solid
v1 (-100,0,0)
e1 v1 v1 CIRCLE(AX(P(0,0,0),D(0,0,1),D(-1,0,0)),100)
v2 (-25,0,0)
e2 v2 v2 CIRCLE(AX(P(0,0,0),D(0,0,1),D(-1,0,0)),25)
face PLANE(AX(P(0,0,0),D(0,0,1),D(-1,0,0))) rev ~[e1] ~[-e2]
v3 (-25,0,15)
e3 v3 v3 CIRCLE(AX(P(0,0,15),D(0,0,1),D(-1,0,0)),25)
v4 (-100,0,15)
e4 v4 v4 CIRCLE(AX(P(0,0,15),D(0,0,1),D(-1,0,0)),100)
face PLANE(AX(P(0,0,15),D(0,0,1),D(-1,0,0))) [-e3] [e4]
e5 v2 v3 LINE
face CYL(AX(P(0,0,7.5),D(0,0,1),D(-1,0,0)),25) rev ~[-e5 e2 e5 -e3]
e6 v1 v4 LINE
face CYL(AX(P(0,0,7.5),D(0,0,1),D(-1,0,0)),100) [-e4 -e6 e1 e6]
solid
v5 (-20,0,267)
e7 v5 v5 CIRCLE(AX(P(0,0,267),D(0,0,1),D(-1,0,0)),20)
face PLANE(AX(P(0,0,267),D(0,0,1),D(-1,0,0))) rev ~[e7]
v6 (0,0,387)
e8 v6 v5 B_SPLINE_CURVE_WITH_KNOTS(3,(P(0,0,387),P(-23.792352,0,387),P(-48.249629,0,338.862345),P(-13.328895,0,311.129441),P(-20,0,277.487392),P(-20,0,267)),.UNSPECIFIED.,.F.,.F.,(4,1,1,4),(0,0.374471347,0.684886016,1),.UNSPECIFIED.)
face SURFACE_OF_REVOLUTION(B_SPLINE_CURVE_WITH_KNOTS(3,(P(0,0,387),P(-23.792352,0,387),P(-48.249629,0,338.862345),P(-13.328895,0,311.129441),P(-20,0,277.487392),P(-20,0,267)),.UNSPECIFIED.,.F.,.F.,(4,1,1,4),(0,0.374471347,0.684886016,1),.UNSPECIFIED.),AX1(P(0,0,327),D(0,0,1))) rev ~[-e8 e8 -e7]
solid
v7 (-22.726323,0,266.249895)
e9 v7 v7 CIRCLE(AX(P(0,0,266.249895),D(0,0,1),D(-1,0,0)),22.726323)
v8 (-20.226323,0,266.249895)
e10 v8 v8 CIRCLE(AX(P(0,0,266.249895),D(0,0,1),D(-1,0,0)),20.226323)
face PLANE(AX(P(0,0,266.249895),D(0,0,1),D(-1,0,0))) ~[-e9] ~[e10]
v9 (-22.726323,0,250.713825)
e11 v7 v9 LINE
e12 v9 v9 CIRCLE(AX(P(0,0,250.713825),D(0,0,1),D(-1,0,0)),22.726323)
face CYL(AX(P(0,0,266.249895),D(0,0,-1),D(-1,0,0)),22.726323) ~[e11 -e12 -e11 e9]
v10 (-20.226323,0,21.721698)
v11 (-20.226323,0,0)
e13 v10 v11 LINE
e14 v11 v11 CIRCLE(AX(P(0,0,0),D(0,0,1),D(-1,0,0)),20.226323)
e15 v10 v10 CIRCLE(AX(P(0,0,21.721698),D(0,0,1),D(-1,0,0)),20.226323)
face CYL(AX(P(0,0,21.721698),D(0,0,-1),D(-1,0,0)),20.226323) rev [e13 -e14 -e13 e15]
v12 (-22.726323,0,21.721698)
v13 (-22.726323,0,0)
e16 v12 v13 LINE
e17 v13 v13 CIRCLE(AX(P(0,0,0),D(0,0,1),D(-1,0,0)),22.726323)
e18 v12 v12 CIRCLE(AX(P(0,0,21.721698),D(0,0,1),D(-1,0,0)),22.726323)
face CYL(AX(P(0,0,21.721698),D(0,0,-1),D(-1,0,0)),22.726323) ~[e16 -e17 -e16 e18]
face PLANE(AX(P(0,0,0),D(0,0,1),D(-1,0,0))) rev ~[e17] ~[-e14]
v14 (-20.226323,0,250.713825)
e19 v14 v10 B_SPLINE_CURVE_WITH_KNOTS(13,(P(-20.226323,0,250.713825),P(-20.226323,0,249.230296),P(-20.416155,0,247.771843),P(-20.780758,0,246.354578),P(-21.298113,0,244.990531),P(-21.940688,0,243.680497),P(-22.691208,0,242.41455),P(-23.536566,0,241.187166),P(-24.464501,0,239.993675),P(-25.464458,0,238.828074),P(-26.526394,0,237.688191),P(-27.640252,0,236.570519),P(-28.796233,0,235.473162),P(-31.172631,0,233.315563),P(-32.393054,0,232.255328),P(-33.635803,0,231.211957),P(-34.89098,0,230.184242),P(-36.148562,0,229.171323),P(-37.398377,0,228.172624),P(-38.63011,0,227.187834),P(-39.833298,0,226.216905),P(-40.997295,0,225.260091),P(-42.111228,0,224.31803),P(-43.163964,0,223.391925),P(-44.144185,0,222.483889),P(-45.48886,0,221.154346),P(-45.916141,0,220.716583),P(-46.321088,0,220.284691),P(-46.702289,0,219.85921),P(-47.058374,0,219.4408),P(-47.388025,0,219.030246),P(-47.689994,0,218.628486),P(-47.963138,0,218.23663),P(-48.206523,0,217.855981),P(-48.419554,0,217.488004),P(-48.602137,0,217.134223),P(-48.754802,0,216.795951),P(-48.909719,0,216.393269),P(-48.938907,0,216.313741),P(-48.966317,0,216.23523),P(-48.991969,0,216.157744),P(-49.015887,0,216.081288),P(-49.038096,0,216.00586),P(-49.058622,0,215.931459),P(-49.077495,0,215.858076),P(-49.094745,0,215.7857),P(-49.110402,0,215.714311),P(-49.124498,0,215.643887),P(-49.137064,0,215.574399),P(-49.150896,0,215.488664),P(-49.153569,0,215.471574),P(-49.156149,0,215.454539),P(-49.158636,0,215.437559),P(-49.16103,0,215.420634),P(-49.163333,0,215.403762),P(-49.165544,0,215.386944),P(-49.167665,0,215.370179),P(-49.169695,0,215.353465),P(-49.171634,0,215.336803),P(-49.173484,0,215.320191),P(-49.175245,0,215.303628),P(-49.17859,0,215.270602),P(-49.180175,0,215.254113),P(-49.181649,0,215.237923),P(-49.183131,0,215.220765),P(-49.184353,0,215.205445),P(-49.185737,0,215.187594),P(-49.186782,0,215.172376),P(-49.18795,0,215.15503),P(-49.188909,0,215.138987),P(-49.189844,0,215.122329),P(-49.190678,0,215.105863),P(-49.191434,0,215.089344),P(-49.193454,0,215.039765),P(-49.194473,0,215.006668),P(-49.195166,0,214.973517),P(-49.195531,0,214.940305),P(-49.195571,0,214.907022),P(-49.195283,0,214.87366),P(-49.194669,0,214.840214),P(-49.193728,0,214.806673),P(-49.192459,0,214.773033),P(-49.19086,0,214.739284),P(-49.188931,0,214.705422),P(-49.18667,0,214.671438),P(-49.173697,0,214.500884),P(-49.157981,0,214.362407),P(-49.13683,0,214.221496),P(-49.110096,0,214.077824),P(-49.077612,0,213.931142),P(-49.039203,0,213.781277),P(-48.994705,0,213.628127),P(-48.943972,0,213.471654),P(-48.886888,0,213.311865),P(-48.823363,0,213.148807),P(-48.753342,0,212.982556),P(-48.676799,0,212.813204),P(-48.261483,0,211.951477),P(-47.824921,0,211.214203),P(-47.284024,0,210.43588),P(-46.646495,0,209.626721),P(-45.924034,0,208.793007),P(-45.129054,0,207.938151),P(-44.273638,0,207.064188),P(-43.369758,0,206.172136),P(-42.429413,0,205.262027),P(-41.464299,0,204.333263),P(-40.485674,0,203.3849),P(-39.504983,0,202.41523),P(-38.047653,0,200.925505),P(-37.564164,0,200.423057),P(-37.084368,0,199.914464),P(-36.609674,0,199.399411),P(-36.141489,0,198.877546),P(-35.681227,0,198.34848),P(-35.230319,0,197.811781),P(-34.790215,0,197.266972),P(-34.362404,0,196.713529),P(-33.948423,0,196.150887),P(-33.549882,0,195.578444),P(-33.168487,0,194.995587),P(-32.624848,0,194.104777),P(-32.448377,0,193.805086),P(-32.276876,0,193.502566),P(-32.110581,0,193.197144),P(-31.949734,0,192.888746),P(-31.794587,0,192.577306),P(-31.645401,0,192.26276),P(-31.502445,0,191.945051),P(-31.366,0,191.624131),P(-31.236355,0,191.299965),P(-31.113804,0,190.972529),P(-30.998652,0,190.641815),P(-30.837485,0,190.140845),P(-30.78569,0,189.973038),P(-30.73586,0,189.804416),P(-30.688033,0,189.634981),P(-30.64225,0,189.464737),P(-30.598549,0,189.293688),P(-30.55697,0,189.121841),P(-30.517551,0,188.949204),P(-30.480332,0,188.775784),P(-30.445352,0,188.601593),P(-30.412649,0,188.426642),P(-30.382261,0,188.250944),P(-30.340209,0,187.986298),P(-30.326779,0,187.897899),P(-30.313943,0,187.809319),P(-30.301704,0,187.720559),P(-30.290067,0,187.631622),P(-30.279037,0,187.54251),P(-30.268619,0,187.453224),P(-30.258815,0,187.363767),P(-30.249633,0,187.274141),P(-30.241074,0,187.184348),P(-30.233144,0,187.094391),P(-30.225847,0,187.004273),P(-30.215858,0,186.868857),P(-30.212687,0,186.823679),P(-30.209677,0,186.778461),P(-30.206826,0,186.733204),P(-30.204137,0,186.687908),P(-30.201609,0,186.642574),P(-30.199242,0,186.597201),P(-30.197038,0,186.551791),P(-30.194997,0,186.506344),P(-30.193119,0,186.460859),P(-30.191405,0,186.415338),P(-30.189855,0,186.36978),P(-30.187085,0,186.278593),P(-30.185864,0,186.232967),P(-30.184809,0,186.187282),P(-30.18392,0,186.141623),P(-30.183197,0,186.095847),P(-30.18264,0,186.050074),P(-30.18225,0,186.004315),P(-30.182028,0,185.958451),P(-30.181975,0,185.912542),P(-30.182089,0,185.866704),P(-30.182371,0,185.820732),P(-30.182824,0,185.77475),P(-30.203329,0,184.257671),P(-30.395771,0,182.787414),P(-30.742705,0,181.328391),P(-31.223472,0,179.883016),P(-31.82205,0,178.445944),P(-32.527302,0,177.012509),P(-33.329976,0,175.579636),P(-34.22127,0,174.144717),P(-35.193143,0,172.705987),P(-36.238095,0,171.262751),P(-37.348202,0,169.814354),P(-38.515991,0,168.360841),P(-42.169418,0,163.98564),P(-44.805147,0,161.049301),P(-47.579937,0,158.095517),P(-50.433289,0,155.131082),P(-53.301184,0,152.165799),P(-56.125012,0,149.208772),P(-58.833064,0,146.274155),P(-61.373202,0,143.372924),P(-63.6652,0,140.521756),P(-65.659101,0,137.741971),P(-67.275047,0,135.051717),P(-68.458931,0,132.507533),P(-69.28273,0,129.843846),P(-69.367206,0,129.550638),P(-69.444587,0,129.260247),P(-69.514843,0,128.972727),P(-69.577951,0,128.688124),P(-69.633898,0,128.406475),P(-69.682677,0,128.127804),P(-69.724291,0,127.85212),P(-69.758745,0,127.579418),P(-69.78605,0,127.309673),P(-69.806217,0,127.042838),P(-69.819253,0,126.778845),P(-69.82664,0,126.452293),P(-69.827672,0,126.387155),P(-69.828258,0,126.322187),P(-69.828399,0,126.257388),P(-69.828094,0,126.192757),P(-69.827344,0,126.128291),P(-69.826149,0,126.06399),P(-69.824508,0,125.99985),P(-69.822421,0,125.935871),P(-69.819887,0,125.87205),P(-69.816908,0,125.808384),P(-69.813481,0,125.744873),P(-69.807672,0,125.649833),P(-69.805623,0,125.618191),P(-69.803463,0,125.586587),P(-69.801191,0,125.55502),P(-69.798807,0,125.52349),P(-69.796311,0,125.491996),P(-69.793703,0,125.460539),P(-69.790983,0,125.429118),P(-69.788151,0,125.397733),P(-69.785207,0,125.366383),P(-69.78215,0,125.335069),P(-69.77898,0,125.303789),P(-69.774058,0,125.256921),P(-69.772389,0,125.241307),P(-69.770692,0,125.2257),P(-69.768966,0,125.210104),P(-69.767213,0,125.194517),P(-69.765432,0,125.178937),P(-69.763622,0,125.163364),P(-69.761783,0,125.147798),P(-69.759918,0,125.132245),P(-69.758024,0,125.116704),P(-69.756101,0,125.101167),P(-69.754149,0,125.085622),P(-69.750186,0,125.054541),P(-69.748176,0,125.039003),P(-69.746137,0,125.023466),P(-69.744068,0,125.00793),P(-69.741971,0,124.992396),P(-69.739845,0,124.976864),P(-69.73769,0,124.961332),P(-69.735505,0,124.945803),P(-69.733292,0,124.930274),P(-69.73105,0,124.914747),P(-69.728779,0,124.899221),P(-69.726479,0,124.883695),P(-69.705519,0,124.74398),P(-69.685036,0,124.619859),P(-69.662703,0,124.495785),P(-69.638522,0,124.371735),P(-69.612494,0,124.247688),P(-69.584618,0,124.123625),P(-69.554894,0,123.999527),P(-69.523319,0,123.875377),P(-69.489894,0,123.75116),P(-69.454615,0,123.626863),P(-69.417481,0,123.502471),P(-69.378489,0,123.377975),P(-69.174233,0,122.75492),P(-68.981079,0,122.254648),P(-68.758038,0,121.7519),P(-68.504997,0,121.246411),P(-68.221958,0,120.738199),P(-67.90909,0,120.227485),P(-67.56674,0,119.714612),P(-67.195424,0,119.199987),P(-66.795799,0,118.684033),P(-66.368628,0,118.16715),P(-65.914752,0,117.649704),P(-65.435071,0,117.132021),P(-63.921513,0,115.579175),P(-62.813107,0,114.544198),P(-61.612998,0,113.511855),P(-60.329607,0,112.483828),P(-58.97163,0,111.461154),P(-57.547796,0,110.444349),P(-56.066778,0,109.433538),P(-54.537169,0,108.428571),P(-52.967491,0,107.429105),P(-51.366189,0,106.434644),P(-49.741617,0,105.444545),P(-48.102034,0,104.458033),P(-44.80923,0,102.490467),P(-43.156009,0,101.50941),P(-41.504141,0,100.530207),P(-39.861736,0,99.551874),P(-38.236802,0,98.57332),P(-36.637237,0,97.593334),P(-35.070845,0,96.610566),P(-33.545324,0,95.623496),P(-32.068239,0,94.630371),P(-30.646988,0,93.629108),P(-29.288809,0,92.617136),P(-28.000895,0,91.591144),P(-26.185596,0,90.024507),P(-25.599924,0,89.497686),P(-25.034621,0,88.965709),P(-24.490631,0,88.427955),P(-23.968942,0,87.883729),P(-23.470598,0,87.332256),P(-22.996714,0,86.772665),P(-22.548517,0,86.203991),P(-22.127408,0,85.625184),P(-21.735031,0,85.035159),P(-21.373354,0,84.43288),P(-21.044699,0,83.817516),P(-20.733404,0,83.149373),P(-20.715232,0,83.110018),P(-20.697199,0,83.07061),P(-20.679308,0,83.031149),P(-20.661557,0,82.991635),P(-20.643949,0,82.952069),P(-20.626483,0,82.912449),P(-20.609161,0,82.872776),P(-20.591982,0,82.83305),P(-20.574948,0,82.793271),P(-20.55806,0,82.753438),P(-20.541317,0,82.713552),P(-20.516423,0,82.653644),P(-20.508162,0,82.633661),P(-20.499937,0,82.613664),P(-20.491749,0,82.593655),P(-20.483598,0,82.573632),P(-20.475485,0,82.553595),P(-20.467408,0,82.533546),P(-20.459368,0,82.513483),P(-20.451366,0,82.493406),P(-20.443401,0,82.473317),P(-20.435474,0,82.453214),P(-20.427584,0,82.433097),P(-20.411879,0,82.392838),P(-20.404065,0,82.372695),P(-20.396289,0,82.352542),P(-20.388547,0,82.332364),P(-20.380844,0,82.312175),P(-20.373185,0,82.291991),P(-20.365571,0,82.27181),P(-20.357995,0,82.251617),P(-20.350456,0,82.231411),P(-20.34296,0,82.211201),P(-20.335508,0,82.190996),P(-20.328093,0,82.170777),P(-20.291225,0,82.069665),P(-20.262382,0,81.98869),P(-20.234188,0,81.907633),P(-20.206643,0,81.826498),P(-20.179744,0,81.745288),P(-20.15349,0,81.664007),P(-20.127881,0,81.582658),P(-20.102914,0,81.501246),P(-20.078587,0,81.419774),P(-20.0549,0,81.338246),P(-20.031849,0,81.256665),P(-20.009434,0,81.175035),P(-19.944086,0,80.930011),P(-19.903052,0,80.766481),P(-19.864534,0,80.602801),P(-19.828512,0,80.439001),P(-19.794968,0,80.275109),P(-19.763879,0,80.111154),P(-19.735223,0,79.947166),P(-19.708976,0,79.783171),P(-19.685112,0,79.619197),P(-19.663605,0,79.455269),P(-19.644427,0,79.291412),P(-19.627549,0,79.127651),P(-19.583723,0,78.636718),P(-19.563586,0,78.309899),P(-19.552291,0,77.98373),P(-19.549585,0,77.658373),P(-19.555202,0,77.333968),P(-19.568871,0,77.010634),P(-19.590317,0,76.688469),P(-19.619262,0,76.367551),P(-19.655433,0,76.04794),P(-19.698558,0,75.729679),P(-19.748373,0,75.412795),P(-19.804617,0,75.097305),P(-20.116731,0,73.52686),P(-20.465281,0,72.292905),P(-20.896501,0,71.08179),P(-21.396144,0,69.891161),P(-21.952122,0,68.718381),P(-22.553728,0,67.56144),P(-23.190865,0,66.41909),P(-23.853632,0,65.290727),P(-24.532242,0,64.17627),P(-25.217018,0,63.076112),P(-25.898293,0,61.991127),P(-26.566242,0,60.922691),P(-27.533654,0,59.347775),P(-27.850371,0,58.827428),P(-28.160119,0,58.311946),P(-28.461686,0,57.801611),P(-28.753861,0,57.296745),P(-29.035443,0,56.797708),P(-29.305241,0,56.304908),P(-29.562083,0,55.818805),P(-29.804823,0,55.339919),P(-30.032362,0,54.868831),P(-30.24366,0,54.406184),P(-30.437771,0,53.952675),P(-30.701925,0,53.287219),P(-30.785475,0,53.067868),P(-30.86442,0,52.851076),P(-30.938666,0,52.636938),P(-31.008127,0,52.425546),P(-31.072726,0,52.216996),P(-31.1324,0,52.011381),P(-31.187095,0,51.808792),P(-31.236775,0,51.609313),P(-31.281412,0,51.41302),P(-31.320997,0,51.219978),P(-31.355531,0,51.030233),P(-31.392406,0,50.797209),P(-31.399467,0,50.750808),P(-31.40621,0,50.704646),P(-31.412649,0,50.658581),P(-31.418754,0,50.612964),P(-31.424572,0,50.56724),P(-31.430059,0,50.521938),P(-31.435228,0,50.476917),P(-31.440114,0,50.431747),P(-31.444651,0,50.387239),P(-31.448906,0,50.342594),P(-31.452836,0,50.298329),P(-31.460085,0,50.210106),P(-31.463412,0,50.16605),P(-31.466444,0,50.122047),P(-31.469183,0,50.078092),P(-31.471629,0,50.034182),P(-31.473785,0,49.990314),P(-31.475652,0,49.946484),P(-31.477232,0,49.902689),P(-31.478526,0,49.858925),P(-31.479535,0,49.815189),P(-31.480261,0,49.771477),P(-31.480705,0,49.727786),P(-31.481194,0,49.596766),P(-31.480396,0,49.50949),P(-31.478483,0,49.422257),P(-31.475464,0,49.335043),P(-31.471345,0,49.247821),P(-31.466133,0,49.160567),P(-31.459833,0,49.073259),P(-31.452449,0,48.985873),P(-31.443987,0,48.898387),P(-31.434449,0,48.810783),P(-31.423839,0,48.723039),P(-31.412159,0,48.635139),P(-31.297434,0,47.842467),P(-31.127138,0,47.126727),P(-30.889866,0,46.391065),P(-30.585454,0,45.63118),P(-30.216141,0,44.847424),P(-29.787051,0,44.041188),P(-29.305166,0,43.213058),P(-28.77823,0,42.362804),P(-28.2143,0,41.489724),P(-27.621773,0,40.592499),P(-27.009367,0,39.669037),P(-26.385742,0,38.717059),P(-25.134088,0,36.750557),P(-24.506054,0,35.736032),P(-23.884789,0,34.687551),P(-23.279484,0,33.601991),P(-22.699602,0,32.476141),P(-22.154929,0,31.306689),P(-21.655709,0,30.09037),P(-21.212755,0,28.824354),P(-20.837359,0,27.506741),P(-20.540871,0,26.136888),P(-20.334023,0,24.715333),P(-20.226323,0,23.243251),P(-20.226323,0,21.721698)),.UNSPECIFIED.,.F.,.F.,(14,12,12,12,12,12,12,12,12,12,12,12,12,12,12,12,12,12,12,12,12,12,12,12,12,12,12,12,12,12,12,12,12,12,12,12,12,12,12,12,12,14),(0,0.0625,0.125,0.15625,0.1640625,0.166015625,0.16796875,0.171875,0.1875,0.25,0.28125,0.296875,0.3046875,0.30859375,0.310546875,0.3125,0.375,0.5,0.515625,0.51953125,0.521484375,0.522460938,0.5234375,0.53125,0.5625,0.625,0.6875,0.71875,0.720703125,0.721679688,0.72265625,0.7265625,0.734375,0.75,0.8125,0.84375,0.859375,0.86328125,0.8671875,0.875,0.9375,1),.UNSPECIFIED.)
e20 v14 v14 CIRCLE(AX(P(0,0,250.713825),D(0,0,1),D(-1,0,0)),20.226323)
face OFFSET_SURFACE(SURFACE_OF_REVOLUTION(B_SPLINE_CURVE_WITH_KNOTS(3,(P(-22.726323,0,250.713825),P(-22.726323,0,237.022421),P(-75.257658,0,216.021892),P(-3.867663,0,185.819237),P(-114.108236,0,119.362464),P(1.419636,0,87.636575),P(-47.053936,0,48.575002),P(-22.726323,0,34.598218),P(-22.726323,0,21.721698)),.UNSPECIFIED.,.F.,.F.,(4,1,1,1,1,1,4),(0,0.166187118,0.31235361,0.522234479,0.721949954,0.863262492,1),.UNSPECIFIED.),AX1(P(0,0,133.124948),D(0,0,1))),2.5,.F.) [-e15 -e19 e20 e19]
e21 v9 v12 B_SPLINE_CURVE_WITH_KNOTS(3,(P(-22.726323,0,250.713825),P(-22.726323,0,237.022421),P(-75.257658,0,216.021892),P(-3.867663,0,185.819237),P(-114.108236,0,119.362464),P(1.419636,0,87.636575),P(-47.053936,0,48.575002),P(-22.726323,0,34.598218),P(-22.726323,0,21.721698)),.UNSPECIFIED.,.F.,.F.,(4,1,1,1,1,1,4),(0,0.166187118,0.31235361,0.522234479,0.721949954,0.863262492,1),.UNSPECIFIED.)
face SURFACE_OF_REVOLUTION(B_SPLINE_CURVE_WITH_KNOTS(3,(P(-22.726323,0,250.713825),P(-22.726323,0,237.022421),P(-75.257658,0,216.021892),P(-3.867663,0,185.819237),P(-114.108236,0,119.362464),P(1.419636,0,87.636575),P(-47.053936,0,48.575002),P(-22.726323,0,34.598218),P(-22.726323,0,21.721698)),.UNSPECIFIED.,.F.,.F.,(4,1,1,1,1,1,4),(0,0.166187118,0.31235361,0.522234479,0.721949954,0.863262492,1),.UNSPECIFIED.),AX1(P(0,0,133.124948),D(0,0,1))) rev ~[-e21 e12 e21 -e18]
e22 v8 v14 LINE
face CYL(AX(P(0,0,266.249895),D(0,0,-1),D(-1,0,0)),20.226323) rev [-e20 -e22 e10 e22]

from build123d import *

# Parameters (mm, degrees)
F0_W = 75
F0_H = 15
F4_T = -2.5


# Not quite as in the source:
# - a feature of the source that left no trace in its solid (it failed there, or was rolled back) is left out


with BuildPart() as f1:
    # F0 (on Front) → F1 (revolve)
    with BuildSketch(Plane.XZ):
        with Locations((-62.5, 7.5)):
            Rectangle(F0_W, F0_H)
    revolve(axis=Axis((0, 0, 28.5546835512), (0, 0, 1)))


with BuildPart() as f3:
    # F2 (on Front) → F3 (revolve)
    with BuildSketch(Plane.XZ):
        with BuildLine():
            Line((-22.7263234556, 21.7216983438), (-22.7263234556, 0))
            Line((-22.7263234556, 0), (0, 0))
            Line((0, 0), (0, 266.2498950958))
            Line((0, 266.2498950958), (-22.7263234556, 266.2498950958))
            Line((-22.7263234556, 266.2498950958), (-22.7263234556, 250.7138252258))
            add(Edge.make_bspline(
                [(-22.7263234556, 250.7138252258), (-22.7263234556, 237.0224211611), (-75.2576582833, 216.0218915756), (-3.8676634027, 185.8192369168), (-114.1082361223, 119.3624638974), (1.4196364649, 87.636575241), (-47.0539357888, 48.5750019051), (-22.7263234556, 34.5982177026), (-22.7263234556, 21.7216983438)],
                knots=[0, 0, 0, 0, 0.166187118, 0.31235361, 0.5222344792, 0.7219499539, 0.8632624919, 1, 1, 1, 1], degree=3))
        make_face()
    revolve(axis=Axis((0, 0, 133.1249475479), (0, 0, 1)))

    # F4
    f4_openings = [f3.faces().sort_by_distance(p)[0] for p in [
        (0, 0, 266.249895),
        (0, 0, 0),
    ]]
    offset(amount=F4_T, openings=f4_openings)


with BuildPart() as f10:
    # F9 (on Front) → F10 (revolve)
    with BuildSketch(Plane.XZ):
        with BuildLine():
            Line((-20, 267), (0, 267))
            Line((0, 267), (0, 387))
            add(Edge.make_bspline(
                [(0, 387), (-23.7923519673, 387), (-48.2496290638, 338.8623447177), (-13.3288953811, 311.1294410668), (-20, 277.4873915765), (-20, 267)],
                knots=[0, 0, 0, 0, 0.3744713465, 0.6848860157, 1, 1, 1, 1], degree=3))
        make_face()
    revolve(axis=Axis((0, 0, 327), (0, 0, 1)))


solid = Compound([f1.part, f3.part, f10.part])
